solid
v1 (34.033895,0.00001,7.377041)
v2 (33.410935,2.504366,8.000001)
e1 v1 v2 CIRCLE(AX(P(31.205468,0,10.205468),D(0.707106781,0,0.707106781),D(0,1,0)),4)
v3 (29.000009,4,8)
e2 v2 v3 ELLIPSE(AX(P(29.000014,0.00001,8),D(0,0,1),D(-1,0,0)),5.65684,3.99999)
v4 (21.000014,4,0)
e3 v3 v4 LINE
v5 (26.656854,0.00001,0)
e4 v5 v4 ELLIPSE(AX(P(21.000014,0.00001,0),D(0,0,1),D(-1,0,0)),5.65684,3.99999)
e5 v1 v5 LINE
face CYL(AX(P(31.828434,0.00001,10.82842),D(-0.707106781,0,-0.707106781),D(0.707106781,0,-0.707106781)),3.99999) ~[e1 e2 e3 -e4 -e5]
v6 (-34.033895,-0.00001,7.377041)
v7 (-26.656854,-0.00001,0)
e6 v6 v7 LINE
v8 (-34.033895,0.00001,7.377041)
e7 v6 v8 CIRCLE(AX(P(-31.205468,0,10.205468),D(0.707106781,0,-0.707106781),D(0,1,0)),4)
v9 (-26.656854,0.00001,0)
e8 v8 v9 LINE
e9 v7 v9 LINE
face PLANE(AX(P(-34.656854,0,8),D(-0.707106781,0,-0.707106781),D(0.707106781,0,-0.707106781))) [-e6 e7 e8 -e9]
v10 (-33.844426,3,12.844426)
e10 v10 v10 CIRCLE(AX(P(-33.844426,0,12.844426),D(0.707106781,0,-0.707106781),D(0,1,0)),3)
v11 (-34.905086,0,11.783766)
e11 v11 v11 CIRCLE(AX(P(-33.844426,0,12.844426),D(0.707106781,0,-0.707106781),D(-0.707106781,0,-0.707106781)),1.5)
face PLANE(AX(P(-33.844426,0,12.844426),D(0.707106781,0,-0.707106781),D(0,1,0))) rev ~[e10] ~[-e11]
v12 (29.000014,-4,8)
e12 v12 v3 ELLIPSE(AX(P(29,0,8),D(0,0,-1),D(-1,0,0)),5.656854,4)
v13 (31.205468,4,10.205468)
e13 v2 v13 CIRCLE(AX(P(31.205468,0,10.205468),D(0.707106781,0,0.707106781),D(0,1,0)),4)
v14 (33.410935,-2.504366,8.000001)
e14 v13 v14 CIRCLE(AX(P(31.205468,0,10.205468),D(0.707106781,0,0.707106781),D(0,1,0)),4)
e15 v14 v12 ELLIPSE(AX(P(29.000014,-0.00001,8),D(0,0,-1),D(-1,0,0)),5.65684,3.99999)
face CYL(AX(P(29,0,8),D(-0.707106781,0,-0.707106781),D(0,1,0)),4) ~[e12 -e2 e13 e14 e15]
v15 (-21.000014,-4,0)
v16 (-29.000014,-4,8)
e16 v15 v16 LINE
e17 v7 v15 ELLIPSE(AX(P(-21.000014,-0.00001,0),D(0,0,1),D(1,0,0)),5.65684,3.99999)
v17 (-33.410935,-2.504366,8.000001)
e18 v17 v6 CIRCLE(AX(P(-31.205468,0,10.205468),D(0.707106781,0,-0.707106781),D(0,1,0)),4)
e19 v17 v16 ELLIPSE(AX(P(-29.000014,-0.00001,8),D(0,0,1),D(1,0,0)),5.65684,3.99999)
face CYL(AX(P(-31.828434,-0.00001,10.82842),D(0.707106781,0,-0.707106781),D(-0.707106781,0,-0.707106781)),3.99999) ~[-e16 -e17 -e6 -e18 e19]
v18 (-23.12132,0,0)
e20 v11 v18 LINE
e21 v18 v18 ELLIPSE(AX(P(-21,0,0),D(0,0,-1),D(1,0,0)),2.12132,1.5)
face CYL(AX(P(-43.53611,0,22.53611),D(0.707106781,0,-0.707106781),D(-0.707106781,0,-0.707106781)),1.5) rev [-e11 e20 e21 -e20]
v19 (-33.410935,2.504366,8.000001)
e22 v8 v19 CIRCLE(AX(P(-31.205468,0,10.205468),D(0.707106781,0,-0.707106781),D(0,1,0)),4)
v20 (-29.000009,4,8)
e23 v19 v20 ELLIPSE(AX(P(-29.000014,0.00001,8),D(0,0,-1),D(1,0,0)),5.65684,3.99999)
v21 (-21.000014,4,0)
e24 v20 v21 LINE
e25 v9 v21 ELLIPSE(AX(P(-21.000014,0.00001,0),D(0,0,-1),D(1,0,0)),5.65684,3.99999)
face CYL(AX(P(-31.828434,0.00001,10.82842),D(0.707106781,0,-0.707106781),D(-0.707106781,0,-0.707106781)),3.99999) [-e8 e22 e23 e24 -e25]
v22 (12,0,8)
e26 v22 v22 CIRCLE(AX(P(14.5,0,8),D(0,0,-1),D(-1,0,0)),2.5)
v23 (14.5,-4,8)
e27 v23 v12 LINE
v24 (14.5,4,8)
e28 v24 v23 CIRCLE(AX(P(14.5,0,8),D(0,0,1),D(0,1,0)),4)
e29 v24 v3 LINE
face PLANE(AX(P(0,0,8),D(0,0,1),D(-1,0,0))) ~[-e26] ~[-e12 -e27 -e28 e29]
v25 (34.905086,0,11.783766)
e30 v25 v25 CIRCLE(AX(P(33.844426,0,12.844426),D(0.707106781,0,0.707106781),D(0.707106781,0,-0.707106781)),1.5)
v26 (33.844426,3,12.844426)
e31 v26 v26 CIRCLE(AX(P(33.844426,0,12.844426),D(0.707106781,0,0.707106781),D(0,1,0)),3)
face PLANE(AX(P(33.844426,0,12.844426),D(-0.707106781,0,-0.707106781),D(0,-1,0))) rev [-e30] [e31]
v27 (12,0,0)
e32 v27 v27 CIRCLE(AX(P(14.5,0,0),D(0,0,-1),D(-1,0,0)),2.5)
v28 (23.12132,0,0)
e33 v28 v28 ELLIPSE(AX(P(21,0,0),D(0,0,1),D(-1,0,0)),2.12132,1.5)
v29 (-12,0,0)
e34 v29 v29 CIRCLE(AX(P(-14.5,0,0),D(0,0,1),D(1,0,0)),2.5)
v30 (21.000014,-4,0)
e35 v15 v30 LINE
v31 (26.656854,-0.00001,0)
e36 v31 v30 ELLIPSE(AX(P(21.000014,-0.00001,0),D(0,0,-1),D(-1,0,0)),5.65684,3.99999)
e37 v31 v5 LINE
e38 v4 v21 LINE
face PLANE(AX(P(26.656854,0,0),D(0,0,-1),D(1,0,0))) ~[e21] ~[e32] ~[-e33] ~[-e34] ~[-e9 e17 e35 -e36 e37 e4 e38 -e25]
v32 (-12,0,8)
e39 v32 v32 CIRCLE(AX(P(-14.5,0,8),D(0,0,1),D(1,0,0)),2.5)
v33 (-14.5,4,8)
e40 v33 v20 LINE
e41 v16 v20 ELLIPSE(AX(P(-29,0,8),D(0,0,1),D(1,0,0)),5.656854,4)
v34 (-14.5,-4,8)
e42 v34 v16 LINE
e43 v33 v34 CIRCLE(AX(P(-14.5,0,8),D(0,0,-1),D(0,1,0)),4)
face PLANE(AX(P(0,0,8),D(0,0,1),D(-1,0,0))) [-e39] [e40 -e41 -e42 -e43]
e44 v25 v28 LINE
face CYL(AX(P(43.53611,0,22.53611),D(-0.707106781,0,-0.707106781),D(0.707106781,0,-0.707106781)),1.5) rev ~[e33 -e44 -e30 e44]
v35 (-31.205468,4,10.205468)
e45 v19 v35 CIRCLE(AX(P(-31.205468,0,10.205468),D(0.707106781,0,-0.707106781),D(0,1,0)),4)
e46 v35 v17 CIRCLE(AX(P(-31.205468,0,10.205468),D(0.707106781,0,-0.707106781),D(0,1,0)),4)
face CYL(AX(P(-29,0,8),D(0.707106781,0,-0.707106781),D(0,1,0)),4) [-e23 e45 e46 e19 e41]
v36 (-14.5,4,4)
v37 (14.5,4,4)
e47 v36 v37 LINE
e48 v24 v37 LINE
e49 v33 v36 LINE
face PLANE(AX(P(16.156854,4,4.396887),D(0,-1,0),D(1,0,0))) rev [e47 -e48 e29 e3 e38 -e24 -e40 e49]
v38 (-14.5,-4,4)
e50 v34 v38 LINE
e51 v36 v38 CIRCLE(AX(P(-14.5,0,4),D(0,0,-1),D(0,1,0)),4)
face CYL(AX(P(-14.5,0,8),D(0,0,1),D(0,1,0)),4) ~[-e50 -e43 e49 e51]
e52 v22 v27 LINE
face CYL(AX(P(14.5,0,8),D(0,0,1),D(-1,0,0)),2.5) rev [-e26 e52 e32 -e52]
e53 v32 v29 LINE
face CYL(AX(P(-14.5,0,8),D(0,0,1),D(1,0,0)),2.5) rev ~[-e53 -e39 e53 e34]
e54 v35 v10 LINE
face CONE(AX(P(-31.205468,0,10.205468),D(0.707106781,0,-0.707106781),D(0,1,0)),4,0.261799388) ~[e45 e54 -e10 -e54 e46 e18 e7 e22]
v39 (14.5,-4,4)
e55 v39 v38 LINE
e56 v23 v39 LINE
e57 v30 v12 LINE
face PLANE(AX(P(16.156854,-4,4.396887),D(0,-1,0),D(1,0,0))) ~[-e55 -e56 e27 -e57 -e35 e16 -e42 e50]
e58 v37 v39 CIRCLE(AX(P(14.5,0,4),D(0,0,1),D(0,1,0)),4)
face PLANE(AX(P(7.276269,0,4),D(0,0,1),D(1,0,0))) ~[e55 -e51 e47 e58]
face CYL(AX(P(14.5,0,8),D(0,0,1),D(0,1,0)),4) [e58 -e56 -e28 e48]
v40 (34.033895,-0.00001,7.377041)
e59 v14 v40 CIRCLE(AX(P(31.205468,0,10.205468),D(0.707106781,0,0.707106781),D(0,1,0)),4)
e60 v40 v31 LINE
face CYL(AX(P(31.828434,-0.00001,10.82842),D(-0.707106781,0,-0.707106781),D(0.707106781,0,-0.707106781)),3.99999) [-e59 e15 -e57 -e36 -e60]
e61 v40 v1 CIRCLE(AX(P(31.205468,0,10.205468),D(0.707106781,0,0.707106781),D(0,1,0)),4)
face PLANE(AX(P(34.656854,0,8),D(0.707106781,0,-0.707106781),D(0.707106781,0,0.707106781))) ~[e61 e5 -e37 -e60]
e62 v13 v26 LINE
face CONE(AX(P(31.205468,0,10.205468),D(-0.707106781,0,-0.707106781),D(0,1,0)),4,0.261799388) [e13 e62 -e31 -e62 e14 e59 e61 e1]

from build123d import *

# Parameters (mm, degrees)
F1_DEPTH  = 4
F2_R      = 3.99999
F3_R      = 2.5
F4_DEPTH  = 8
F6_DEPTH  = 4
F9_R      = 4
F10_DEPTH = 6.851053331


# Not quite as in the source:
# - a fillet or chamfer that OpenCascade refuses, or shapes differently, is made with other operations: its cross-section is extruded or revolved along the edge and cut away or added
# - a fillet or chamfer is up to 0.001 mm smaller than in the source, because OpenCascade refuses the exact size


with BuildPart() as f1:
    # F0 (on Front) → F1 (new body, symmetric)
    with BuildSketch(Plane.XZ):
        Polygon((-26.6568542495, 0), (0, 0), (0, 8), (-34.6568542495, 8), align=None)
    extrude(amount=F1_DEPTH, both=True)

    # F2 (radius 4 in the source; OpenCascade refuses exactly that, so slightly less here)
    f2_edges = [f1.edges().sort_by_distance(p)[0] for p in [
        (-30.656854, 4, 4),
        (-30.656854, -4, 4),
    ]]
    fillet(f2_edges, radius=F2_R)

    # F3 (on face) → F4 (cut, through all)
    with BuildSketch(Plane.XY.offset(8)):
        with Locations((-14.5, 0)):
            Circle(F3_R)
    extrude(amount=-F4_DEPTH, mode=Mode.SUBTRACT)

    # F5 (on face) → F6 (cut)
    with BuildSketch(Plane.XY.offset(8)):
        with BuildLine():
            ThreePointArc((-14.5, 4), (-10.5, 0), (-14.5, -4))
            Line((-14.5, -4), (0, -4))
            Line((0, -4), (0, 4))
            Line((0, 4), (-14.5, 4))
        make_face()
    extrude(amount=-F6_DEPTH, mode=Mode.SUBTRACT)

    # F9 (on line) → F10 (join, symmetric)
    with BuildSketch(Plane(origin=(-18.5, 0, 18.5), x_dir=(0, 1, 0), z_dir=(0.7071067812, 0, -0.7071067812))):
        with Locations((0, -14.8492424049)):
            Circle(F9_R)
    extrude(amount=F10_DEPTH, both=True)

    # F7 (on Front) → F11 (revolve, cut)
    with BuildSketch(Plane.XZ):
        Polygon((-20.5108239612, -2.6104963823), (-19.4501637894, -1.5498362106), (-43.5361095251, 22.5361095251), (-44.5967696969, 21.4754493533), align=None)
    revolve(axis=Axis((-31.4931366573, 0, 10.4931366573), (-0.7071067812, 0, 0.7071067812)), mode=Mode.SUBTRACT)

    # F12: chamfer of 1 x 3.7320508076 on 1 edges, made by hand

    # F12_s1 → F12_t2 (revolve, cut)
    with BuildSketch(Plane(origin=(-10.5, 0, -10.5), x_dir=(0, 1, 0), z_dir=(-0.7071067812, 0, -0.7071067812))):
        Polygon((4, -29.2819534274), (3, -33.0140042349), (4, -33.0140042349), align=None)
    revolve(axis=Axis((-33.8444262687, 0, 12.8444262687), (0.7071067812, 0, -0.7071067812)), mode=Mode.SUBTRACT)

    # F13: F1 across face


with BuildPart() as f1_1:
    add(f1.part)
    add(f1.part.mirror(Plane(origin=(0, 0, 2), x_dir=(0, 1, 0), z_dir=(1, 0, 0))))


solid = f1_1.part
